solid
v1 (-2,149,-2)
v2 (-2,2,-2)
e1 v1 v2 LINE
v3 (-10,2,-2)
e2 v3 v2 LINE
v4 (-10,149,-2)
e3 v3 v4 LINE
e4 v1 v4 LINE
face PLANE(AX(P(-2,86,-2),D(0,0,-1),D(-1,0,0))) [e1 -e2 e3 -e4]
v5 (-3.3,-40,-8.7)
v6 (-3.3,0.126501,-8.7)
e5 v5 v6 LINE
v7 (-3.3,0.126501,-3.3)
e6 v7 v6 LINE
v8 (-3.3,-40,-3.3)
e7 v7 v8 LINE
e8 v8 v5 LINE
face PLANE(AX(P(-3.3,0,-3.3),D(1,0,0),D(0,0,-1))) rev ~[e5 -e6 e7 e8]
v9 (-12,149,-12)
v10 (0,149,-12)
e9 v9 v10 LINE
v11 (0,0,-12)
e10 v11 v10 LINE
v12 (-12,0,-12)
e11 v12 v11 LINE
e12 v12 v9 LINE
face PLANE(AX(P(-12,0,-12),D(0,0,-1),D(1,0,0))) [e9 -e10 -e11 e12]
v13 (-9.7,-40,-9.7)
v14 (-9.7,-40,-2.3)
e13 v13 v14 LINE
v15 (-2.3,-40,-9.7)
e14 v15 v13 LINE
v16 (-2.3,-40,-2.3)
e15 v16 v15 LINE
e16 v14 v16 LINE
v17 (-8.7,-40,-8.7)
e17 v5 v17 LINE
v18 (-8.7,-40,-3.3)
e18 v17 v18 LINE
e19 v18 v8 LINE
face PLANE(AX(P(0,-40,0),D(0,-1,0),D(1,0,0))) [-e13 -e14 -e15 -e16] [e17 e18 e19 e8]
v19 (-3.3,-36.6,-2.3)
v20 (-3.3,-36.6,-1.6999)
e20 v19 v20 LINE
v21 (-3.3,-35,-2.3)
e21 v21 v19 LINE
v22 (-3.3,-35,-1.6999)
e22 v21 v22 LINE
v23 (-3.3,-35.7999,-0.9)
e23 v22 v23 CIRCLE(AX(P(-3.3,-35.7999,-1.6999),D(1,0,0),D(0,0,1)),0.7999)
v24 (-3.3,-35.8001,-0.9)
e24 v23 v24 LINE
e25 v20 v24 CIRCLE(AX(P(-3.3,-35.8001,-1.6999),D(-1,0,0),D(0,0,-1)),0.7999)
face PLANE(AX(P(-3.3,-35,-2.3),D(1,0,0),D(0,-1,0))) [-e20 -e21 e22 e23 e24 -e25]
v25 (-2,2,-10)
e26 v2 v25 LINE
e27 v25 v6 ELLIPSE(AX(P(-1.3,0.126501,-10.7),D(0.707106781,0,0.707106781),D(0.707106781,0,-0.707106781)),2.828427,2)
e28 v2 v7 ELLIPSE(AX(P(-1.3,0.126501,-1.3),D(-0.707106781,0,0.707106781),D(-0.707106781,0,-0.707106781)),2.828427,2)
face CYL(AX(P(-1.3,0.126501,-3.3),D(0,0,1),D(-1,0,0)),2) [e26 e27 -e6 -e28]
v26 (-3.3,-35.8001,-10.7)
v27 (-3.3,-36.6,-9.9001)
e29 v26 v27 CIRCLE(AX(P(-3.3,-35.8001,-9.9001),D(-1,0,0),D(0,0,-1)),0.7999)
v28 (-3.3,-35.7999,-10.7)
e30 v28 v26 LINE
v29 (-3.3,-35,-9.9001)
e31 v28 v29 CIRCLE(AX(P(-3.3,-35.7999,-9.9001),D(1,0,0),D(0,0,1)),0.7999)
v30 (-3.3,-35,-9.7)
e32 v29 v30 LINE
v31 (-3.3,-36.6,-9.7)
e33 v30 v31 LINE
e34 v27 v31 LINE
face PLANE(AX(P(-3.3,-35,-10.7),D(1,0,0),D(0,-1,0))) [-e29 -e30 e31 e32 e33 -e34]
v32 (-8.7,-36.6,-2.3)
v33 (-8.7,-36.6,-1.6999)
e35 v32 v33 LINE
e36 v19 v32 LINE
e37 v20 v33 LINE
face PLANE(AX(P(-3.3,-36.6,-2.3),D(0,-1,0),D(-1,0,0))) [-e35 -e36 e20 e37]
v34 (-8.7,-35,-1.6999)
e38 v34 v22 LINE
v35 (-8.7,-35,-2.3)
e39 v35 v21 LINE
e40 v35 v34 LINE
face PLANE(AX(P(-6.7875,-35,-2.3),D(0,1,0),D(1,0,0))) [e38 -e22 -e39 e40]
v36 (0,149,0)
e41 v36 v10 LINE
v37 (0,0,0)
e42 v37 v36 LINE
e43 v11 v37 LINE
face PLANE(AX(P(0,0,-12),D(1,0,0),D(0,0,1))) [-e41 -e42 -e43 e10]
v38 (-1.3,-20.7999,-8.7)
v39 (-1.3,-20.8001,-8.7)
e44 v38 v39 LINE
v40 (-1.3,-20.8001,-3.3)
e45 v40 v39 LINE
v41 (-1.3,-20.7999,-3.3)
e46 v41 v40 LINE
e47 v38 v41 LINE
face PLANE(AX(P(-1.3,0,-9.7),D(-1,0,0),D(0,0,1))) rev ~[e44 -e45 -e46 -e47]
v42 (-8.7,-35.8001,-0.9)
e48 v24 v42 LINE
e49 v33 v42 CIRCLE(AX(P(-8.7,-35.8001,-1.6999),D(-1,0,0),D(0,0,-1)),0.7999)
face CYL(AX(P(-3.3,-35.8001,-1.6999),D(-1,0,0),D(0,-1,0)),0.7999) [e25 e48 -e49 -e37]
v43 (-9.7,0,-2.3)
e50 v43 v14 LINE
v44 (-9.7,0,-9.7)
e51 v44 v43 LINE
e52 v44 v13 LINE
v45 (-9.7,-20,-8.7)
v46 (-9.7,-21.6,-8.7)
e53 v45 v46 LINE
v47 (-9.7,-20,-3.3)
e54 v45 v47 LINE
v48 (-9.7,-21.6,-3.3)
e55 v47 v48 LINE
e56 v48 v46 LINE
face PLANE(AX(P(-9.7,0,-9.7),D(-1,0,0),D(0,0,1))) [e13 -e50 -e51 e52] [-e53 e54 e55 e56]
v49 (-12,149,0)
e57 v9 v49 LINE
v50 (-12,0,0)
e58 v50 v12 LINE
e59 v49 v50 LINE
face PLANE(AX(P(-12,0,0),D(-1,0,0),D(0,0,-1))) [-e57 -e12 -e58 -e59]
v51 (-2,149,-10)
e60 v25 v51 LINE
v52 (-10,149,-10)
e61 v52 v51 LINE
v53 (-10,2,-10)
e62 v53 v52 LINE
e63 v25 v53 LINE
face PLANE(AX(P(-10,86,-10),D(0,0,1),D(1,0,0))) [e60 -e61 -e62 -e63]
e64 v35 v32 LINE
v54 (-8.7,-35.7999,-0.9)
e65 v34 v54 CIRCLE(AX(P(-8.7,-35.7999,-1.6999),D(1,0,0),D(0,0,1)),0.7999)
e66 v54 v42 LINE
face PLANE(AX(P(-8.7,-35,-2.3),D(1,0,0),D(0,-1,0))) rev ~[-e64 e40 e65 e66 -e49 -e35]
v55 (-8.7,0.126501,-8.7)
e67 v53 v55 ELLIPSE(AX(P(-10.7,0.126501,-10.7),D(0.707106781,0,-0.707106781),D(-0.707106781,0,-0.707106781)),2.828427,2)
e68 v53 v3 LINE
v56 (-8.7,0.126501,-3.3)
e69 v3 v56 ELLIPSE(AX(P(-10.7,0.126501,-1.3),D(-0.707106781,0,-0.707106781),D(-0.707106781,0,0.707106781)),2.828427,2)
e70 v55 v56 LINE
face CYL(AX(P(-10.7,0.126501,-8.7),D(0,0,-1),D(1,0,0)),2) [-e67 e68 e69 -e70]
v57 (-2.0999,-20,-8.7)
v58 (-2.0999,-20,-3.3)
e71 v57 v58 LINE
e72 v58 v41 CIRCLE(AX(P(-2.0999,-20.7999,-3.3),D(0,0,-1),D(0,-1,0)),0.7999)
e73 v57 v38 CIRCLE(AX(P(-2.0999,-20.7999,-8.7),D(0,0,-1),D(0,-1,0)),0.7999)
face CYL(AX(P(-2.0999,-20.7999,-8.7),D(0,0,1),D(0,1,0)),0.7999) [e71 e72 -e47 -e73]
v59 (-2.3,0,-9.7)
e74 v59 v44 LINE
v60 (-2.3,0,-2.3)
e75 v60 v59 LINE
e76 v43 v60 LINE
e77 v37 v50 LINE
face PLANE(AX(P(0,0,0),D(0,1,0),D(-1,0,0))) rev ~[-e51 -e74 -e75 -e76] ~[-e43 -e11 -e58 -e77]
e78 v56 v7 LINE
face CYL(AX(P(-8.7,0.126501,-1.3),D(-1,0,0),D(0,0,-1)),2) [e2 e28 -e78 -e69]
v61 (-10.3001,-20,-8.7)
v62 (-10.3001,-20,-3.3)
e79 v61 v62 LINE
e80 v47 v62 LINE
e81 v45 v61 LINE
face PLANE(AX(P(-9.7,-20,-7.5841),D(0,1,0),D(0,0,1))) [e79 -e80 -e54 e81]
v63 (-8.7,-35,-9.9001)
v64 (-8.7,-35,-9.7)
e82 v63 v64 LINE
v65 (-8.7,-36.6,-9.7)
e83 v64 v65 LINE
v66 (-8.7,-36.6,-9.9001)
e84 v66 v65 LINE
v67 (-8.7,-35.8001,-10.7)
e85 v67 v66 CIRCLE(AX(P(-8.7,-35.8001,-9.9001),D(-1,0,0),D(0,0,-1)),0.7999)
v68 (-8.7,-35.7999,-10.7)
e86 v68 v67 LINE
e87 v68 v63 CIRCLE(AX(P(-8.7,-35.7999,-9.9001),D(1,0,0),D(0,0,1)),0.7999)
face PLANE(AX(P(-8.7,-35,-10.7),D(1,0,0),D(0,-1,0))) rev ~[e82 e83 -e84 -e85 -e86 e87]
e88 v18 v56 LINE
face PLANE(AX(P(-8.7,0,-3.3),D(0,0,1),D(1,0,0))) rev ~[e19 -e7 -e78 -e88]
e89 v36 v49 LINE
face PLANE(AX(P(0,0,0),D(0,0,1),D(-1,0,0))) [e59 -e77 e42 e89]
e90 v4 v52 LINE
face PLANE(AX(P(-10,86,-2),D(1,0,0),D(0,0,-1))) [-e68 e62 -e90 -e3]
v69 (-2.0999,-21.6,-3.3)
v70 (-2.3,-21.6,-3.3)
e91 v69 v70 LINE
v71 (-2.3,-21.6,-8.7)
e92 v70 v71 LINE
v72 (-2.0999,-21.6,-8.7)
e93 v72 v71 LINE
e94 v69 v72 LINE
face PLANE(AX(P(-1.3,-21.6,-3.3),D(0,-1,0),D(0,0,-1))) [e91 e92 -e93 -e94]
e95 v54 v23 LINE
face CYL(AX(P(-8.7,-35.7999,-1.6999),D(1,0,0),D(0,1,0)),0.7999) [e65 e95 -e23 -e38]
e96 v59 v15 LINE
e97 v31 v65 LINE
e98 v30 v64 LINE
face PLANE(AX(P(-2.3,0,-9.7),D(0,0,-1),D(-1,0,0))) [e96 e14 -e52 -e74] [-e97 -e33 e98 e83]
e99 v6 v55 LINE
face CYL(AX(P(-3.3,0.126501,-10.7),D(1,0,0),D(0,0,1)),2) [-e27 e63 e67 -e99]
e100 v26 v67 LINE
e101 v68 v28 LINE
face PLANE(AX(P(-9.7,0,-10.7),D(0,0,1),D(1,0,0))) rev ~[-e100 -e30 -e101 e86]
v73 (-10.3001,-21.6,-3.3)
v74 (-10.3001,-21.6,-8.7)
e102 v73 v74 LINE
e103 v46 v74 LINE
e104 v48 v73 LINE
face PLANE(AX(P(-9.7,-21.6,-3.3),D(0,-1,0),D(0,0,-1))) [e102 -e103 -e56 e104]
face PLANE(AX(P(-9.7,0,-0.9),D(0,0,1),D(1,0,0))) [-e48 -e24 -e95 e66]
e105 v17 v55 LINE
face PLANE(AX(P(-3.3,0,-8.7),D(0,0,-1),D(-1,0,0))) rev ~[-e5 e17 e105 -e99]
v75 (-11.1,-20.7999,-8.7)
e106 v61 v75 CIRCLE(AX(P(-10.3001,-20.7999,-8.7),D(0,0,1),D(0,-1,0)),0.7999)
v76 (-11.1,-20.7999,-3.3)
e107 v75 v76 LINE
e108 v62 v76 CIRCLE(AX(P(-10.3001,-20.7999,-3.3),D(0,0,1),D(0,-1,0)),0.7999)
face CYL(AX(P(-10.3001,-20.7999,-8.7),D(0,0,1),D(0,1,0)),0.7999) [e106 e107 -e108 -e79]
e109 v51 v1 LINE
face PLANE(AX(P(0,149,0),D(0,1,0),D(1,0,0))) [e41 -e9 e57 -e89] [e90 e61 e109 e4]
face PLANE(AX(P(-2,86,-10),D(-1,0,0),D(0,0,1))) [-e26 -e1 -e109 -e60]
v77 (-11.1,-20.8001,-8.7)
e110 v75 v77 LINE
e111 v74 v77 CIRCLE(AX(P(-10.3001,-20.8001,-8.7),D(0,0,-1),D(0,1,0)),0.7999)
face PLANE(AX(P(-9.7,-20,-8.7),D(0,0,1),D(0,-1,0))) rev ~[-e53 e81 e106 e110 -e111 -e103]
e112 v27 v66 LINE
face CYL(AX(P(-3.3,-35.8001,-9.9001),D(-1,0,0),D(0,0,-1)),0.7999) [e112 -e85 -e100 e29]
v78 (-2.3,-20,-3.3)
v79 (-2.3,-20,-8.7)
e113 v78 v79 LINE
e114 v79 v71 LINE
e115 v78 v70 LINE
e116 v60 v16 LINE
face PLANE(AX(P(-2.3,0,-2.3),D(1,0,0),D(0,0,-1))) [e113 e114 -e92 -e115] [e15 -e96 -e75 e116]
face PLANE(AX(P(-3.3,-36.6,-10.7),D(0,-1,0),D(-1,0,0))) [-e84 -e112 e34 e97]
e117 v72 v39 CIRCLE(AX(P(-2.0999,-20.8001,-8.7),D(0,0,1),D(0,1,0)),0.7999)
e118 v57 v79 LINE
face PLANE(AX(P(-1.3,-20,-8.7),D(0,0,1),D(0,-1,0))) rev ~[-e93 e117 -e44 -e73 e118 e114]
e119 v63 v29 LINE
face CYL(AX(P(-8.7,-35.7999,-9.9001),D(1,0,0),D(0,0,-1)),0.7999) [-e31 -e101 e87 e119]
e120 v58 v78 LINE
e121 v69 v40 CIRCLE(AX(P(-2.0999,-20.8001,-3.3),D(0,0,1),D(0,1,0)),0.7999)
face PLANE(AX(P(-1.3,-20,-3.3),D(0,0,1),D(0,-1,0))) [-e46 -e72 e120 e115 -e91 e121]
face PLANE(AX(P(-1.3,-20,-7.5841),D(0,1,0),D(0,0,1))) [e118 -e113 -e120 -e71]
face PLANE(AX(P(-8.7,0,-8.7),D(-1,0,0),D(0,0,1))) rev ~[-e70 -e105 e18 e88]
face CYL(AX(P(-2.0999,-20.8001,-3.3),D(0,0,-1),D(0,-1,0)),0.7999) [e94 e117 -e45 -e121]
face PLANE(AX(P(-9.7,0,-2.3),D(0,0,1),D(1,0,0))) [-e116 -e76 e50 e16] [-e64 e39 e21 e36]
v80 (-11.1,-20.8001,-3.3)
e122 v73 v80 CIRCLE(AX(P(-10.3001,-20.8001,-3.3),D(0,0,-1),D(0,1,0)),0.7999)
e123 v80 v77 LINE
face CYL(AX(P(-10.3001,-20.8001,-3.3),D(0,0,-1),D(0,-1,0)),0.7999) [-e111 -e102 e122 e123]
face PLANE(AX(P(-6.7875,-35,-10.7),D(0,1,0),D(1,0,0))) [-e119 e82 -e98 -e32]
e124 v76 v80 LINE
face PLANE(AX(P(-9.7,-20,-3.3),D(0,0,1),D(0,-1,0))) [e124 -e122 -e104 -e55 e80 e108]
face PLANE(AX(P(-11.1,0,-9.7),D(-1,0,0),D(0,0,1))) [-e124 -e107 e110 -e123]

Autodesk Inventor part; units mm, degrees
ref_plane "YZ Plane" through (0, 0, 0) normal (1, 0, 0) x (0, 1, 0)
ref_plane "XZ Plane" through (0, 0, 0) normal (0, 1, 0) x (-1, 0, 0)
ref_plane "XY Plane" through (0, 0, 0) normal (0, 0, 1) x (1, 0, 0)
sketch "Szkic1" plane through (0, 0, 0) normal (0, 1, 0) x (-1, 0, 0)
  line L0 (0, 0) -> (12, 0)
  line L1 (12, 0) -> (12, -12)
  line L2 (12, -12) -> (0, -12)
  line L3 (0, -12) -> (0, 0)
  dimension "d0" = 12
  dimension "d1" = 12
extrude "Wyciągnięcie proste1" add sketch "Szkic1" along normal blind 86
sketch "Szkic2" plane through (0, 86, 0) normal (0, 1, 0) x (1, 0, 0)
  line L0 (0, 12) -> (-12, 12) projected
  line L1 (-12, 12) -> (-12, 0) projected
  line L2 (-12, 0) -> (0, 0) projected
  line L3 (0, 0) -> (0, 12) projected
  line L4 (-10, 2) -> (-10, 10)
  line L5 (-10, 10) -> (-2, 10)
  line L6 (-2, 10) -> (-2, 2)
  line L7 (-2, 2) -> (-10, 2)
  dimension "d4" = 2
extrude "Wyciągnięcie proste2" cut sketch "Szkic2" against normal blind 86 contours L4 L5 L6 L7
sketch "Szkic9" plane through (0, 0, 0) normal (0, -1, 0) x (1, 0, 0)
  line L0 (-2, -10) -> (-10, -10) projected
  line L1 (-2, -2) -> (-2, -10) projected
  line L2 (-10, -2) -> (-2, -2) projected
  line L3 (-10, -10) -> (-10, -2) projected
  line L4 (-2.3, -2.3) -> (-2.3, -9.7)
  line L5 (-2.3, -9.7) -> (-9.7, -9.7)
  line L6 (-9.7, -9.7) -> (-9.7, -2.3)
  line L7 (-9.7, -2.3) -> (-2.3, -2.3)
  line L8 (-3.3, -3.3) -> (-3.3, -8.7)
  line L9 (-3.3, -8.7) -> (-8.7, -8.7)
  line L10 (-8.7, -8.7) -> (-8.7, -3.3)
  line L11 (-8.7, -3.3) -> (-3.3, -3.3)
  point P0 (0, 0)
  dimension "d21" = 0.3
  dimension "d22" = 1
extrude "Wyciągnięcie proste8" add sketch "Szkic9" along normal blind 40 contours L4 L5 L6 L7
sketch "Szkic10" plane through (0, 0, 0) normal (0, 1, 0) x (1, 0, 0)
  line L0 (-2, 2) -> (-2, 10) projected
  line L1 (-10.1182, 1.9087) -> (-2, 1.9087)
  line L2 (-2, 1.9087) -> (-2, 10)
  line L3 (-2, 10) -> (-10.1182, 10)
  line L4 (-10.1182, 10) -> (-10.1182, 1.9087)
  line L5 (-3.3, 3.3) -> (-3.3, 8.7) projected
  line L6 (-8.7, 3.3) -> (-3.3, 3.3) projected
  line L7 (-8.7, 8.7) -> (-8.7, 3.3) projected
  line L8 (-3.3, 8.7) -> (-8.7, 8.7) projected
  line L9 (-8.7, 3.3) -> (-3.3, 3.3)
  line L10 (-3.3, 3.3) -> (-3.3, 8.7)
  line L11 (-3.3, 8.7) -> (-8.7, 8.7)
  line L12 (-8.7, 8.7) -> (-8.7, 3.3)
  point P0 (0, 0)
extrude "Wyciągnięcie proste9" add sketch "Szkic10" along normal blind 2
sketch "Szkic11" plane through (-9.7, 0, -9.7) normal (-1, 0, 0) x (0, 0, 1)
  line L0 (7.4, 0) -> (0, 0) projected
  line L1 (2.1159, 0) -> (2.1159, -20)
  line L2 (1, 2) -> (1, -40) projected
  line L3 (6.4, 2) -> (6.4, -40) projected
  line L4 (1, -20) -> (6.4, -20)
  line L5 (6.4, -20) -> (6.4, -21.6)
  line L6 (6.4, -21.6) -> (1, -21.6)
  line L7 (1, -21.6) -> (1, -20)
  point P0 (9.7, 0)
  point P1 (1, -21.6)
  dimension "d27" = 20
  dimension "d28" = 1.6
extrude "Wyciągnięcie proste10" add sketch "Szkic11" along normal blind 1.4 contours L3 L6 L2 L4
pattern_linear "Szyk prostokątny1" count 2 spacing 8.4 along (1, 0, 0) of "Wyciągnięcie proste10"
sketch "Szkic12" plane through (-9.7, 0, -2.3) normal (0, 0, 1) x (1, 0, 0)
  line L0 (9.7, 0) -> (-2.3, 0) projected
  line L1 (2.9125, 0) -> (2.9125, -35)
  line L2 (1, 2) -> (1, -40) projected
  line L3 (1, 2) -> (1, -40) projected
  line L4 (6.4, 2) -> (6.4, -40) projected
  line L5 (1, -35) -> (6.4, -35)
  line L6 (6.4, -35) -> (6.4, -36.6)
  line L7 (6.4, -36.6) -> (1, -36.6)
  line L8 (1, -36.6) -> (1, -35)
  dimension "d34" = 35
  dimension "d35" = 1.6
extrude "Wyciągnięcie proste11" add sketch "Szkic12" along normal blind 1.4 contours L4 L7 L2 L5
pattern_linear "Szyk prostokątny2" count 2 spacing 8.4 along (0, 0, -1) of "Wyciągnięcie proste11"
fillet "Zaokrąglenie1" radius 2 4 edges at (-8.7, 2, -6) (-6, 2, -3.3) (-6, 2, -8.7) (-3.3, 2, -6)
sketch "Szkic13" plane through (0, 86, 0) normal (0, 1, 0) x (1, 0, 0)
  line L0 (0, 0) -> (0, 12) projected
  line L1 (-12, 12) -> (-12, 0) projected
  line L2 (0, 0) -> (-12, 0)
  line L3 (-12, 0) -> (-12, 12)
  line L4 (-12, 12) -> (0, 12)
  line L5 (0, 12) -> (0, 0)
  line L6 (-2, 10) -> (-2, 2) projected
  line L7 (-10, 2) -> (-10, 10) projected
  line L8 (-2, 2) -> (-10, 2)
  line L9 (-10, 2) -> (-10, 10)
  line L10 (-10, 10) -> (-2, 10)
  line L11 (-2, 10) -> (-2, 2)
extrude "Wyciągnięcie proste12" add sketch "Szkic13" along normal blind 63
fillet "Zaokrąglenie2" radius 0.8 8 edges at (-11.1, -20, -6) (-11.1, -21.6, -6) (-1.3, -20, -6) (-1.3, -21.6, -6) (-6, -36.6, -0.9) (-6, -35, -0.9) (-6, -35, -10.7) (-6, -36.6, -10.7)
